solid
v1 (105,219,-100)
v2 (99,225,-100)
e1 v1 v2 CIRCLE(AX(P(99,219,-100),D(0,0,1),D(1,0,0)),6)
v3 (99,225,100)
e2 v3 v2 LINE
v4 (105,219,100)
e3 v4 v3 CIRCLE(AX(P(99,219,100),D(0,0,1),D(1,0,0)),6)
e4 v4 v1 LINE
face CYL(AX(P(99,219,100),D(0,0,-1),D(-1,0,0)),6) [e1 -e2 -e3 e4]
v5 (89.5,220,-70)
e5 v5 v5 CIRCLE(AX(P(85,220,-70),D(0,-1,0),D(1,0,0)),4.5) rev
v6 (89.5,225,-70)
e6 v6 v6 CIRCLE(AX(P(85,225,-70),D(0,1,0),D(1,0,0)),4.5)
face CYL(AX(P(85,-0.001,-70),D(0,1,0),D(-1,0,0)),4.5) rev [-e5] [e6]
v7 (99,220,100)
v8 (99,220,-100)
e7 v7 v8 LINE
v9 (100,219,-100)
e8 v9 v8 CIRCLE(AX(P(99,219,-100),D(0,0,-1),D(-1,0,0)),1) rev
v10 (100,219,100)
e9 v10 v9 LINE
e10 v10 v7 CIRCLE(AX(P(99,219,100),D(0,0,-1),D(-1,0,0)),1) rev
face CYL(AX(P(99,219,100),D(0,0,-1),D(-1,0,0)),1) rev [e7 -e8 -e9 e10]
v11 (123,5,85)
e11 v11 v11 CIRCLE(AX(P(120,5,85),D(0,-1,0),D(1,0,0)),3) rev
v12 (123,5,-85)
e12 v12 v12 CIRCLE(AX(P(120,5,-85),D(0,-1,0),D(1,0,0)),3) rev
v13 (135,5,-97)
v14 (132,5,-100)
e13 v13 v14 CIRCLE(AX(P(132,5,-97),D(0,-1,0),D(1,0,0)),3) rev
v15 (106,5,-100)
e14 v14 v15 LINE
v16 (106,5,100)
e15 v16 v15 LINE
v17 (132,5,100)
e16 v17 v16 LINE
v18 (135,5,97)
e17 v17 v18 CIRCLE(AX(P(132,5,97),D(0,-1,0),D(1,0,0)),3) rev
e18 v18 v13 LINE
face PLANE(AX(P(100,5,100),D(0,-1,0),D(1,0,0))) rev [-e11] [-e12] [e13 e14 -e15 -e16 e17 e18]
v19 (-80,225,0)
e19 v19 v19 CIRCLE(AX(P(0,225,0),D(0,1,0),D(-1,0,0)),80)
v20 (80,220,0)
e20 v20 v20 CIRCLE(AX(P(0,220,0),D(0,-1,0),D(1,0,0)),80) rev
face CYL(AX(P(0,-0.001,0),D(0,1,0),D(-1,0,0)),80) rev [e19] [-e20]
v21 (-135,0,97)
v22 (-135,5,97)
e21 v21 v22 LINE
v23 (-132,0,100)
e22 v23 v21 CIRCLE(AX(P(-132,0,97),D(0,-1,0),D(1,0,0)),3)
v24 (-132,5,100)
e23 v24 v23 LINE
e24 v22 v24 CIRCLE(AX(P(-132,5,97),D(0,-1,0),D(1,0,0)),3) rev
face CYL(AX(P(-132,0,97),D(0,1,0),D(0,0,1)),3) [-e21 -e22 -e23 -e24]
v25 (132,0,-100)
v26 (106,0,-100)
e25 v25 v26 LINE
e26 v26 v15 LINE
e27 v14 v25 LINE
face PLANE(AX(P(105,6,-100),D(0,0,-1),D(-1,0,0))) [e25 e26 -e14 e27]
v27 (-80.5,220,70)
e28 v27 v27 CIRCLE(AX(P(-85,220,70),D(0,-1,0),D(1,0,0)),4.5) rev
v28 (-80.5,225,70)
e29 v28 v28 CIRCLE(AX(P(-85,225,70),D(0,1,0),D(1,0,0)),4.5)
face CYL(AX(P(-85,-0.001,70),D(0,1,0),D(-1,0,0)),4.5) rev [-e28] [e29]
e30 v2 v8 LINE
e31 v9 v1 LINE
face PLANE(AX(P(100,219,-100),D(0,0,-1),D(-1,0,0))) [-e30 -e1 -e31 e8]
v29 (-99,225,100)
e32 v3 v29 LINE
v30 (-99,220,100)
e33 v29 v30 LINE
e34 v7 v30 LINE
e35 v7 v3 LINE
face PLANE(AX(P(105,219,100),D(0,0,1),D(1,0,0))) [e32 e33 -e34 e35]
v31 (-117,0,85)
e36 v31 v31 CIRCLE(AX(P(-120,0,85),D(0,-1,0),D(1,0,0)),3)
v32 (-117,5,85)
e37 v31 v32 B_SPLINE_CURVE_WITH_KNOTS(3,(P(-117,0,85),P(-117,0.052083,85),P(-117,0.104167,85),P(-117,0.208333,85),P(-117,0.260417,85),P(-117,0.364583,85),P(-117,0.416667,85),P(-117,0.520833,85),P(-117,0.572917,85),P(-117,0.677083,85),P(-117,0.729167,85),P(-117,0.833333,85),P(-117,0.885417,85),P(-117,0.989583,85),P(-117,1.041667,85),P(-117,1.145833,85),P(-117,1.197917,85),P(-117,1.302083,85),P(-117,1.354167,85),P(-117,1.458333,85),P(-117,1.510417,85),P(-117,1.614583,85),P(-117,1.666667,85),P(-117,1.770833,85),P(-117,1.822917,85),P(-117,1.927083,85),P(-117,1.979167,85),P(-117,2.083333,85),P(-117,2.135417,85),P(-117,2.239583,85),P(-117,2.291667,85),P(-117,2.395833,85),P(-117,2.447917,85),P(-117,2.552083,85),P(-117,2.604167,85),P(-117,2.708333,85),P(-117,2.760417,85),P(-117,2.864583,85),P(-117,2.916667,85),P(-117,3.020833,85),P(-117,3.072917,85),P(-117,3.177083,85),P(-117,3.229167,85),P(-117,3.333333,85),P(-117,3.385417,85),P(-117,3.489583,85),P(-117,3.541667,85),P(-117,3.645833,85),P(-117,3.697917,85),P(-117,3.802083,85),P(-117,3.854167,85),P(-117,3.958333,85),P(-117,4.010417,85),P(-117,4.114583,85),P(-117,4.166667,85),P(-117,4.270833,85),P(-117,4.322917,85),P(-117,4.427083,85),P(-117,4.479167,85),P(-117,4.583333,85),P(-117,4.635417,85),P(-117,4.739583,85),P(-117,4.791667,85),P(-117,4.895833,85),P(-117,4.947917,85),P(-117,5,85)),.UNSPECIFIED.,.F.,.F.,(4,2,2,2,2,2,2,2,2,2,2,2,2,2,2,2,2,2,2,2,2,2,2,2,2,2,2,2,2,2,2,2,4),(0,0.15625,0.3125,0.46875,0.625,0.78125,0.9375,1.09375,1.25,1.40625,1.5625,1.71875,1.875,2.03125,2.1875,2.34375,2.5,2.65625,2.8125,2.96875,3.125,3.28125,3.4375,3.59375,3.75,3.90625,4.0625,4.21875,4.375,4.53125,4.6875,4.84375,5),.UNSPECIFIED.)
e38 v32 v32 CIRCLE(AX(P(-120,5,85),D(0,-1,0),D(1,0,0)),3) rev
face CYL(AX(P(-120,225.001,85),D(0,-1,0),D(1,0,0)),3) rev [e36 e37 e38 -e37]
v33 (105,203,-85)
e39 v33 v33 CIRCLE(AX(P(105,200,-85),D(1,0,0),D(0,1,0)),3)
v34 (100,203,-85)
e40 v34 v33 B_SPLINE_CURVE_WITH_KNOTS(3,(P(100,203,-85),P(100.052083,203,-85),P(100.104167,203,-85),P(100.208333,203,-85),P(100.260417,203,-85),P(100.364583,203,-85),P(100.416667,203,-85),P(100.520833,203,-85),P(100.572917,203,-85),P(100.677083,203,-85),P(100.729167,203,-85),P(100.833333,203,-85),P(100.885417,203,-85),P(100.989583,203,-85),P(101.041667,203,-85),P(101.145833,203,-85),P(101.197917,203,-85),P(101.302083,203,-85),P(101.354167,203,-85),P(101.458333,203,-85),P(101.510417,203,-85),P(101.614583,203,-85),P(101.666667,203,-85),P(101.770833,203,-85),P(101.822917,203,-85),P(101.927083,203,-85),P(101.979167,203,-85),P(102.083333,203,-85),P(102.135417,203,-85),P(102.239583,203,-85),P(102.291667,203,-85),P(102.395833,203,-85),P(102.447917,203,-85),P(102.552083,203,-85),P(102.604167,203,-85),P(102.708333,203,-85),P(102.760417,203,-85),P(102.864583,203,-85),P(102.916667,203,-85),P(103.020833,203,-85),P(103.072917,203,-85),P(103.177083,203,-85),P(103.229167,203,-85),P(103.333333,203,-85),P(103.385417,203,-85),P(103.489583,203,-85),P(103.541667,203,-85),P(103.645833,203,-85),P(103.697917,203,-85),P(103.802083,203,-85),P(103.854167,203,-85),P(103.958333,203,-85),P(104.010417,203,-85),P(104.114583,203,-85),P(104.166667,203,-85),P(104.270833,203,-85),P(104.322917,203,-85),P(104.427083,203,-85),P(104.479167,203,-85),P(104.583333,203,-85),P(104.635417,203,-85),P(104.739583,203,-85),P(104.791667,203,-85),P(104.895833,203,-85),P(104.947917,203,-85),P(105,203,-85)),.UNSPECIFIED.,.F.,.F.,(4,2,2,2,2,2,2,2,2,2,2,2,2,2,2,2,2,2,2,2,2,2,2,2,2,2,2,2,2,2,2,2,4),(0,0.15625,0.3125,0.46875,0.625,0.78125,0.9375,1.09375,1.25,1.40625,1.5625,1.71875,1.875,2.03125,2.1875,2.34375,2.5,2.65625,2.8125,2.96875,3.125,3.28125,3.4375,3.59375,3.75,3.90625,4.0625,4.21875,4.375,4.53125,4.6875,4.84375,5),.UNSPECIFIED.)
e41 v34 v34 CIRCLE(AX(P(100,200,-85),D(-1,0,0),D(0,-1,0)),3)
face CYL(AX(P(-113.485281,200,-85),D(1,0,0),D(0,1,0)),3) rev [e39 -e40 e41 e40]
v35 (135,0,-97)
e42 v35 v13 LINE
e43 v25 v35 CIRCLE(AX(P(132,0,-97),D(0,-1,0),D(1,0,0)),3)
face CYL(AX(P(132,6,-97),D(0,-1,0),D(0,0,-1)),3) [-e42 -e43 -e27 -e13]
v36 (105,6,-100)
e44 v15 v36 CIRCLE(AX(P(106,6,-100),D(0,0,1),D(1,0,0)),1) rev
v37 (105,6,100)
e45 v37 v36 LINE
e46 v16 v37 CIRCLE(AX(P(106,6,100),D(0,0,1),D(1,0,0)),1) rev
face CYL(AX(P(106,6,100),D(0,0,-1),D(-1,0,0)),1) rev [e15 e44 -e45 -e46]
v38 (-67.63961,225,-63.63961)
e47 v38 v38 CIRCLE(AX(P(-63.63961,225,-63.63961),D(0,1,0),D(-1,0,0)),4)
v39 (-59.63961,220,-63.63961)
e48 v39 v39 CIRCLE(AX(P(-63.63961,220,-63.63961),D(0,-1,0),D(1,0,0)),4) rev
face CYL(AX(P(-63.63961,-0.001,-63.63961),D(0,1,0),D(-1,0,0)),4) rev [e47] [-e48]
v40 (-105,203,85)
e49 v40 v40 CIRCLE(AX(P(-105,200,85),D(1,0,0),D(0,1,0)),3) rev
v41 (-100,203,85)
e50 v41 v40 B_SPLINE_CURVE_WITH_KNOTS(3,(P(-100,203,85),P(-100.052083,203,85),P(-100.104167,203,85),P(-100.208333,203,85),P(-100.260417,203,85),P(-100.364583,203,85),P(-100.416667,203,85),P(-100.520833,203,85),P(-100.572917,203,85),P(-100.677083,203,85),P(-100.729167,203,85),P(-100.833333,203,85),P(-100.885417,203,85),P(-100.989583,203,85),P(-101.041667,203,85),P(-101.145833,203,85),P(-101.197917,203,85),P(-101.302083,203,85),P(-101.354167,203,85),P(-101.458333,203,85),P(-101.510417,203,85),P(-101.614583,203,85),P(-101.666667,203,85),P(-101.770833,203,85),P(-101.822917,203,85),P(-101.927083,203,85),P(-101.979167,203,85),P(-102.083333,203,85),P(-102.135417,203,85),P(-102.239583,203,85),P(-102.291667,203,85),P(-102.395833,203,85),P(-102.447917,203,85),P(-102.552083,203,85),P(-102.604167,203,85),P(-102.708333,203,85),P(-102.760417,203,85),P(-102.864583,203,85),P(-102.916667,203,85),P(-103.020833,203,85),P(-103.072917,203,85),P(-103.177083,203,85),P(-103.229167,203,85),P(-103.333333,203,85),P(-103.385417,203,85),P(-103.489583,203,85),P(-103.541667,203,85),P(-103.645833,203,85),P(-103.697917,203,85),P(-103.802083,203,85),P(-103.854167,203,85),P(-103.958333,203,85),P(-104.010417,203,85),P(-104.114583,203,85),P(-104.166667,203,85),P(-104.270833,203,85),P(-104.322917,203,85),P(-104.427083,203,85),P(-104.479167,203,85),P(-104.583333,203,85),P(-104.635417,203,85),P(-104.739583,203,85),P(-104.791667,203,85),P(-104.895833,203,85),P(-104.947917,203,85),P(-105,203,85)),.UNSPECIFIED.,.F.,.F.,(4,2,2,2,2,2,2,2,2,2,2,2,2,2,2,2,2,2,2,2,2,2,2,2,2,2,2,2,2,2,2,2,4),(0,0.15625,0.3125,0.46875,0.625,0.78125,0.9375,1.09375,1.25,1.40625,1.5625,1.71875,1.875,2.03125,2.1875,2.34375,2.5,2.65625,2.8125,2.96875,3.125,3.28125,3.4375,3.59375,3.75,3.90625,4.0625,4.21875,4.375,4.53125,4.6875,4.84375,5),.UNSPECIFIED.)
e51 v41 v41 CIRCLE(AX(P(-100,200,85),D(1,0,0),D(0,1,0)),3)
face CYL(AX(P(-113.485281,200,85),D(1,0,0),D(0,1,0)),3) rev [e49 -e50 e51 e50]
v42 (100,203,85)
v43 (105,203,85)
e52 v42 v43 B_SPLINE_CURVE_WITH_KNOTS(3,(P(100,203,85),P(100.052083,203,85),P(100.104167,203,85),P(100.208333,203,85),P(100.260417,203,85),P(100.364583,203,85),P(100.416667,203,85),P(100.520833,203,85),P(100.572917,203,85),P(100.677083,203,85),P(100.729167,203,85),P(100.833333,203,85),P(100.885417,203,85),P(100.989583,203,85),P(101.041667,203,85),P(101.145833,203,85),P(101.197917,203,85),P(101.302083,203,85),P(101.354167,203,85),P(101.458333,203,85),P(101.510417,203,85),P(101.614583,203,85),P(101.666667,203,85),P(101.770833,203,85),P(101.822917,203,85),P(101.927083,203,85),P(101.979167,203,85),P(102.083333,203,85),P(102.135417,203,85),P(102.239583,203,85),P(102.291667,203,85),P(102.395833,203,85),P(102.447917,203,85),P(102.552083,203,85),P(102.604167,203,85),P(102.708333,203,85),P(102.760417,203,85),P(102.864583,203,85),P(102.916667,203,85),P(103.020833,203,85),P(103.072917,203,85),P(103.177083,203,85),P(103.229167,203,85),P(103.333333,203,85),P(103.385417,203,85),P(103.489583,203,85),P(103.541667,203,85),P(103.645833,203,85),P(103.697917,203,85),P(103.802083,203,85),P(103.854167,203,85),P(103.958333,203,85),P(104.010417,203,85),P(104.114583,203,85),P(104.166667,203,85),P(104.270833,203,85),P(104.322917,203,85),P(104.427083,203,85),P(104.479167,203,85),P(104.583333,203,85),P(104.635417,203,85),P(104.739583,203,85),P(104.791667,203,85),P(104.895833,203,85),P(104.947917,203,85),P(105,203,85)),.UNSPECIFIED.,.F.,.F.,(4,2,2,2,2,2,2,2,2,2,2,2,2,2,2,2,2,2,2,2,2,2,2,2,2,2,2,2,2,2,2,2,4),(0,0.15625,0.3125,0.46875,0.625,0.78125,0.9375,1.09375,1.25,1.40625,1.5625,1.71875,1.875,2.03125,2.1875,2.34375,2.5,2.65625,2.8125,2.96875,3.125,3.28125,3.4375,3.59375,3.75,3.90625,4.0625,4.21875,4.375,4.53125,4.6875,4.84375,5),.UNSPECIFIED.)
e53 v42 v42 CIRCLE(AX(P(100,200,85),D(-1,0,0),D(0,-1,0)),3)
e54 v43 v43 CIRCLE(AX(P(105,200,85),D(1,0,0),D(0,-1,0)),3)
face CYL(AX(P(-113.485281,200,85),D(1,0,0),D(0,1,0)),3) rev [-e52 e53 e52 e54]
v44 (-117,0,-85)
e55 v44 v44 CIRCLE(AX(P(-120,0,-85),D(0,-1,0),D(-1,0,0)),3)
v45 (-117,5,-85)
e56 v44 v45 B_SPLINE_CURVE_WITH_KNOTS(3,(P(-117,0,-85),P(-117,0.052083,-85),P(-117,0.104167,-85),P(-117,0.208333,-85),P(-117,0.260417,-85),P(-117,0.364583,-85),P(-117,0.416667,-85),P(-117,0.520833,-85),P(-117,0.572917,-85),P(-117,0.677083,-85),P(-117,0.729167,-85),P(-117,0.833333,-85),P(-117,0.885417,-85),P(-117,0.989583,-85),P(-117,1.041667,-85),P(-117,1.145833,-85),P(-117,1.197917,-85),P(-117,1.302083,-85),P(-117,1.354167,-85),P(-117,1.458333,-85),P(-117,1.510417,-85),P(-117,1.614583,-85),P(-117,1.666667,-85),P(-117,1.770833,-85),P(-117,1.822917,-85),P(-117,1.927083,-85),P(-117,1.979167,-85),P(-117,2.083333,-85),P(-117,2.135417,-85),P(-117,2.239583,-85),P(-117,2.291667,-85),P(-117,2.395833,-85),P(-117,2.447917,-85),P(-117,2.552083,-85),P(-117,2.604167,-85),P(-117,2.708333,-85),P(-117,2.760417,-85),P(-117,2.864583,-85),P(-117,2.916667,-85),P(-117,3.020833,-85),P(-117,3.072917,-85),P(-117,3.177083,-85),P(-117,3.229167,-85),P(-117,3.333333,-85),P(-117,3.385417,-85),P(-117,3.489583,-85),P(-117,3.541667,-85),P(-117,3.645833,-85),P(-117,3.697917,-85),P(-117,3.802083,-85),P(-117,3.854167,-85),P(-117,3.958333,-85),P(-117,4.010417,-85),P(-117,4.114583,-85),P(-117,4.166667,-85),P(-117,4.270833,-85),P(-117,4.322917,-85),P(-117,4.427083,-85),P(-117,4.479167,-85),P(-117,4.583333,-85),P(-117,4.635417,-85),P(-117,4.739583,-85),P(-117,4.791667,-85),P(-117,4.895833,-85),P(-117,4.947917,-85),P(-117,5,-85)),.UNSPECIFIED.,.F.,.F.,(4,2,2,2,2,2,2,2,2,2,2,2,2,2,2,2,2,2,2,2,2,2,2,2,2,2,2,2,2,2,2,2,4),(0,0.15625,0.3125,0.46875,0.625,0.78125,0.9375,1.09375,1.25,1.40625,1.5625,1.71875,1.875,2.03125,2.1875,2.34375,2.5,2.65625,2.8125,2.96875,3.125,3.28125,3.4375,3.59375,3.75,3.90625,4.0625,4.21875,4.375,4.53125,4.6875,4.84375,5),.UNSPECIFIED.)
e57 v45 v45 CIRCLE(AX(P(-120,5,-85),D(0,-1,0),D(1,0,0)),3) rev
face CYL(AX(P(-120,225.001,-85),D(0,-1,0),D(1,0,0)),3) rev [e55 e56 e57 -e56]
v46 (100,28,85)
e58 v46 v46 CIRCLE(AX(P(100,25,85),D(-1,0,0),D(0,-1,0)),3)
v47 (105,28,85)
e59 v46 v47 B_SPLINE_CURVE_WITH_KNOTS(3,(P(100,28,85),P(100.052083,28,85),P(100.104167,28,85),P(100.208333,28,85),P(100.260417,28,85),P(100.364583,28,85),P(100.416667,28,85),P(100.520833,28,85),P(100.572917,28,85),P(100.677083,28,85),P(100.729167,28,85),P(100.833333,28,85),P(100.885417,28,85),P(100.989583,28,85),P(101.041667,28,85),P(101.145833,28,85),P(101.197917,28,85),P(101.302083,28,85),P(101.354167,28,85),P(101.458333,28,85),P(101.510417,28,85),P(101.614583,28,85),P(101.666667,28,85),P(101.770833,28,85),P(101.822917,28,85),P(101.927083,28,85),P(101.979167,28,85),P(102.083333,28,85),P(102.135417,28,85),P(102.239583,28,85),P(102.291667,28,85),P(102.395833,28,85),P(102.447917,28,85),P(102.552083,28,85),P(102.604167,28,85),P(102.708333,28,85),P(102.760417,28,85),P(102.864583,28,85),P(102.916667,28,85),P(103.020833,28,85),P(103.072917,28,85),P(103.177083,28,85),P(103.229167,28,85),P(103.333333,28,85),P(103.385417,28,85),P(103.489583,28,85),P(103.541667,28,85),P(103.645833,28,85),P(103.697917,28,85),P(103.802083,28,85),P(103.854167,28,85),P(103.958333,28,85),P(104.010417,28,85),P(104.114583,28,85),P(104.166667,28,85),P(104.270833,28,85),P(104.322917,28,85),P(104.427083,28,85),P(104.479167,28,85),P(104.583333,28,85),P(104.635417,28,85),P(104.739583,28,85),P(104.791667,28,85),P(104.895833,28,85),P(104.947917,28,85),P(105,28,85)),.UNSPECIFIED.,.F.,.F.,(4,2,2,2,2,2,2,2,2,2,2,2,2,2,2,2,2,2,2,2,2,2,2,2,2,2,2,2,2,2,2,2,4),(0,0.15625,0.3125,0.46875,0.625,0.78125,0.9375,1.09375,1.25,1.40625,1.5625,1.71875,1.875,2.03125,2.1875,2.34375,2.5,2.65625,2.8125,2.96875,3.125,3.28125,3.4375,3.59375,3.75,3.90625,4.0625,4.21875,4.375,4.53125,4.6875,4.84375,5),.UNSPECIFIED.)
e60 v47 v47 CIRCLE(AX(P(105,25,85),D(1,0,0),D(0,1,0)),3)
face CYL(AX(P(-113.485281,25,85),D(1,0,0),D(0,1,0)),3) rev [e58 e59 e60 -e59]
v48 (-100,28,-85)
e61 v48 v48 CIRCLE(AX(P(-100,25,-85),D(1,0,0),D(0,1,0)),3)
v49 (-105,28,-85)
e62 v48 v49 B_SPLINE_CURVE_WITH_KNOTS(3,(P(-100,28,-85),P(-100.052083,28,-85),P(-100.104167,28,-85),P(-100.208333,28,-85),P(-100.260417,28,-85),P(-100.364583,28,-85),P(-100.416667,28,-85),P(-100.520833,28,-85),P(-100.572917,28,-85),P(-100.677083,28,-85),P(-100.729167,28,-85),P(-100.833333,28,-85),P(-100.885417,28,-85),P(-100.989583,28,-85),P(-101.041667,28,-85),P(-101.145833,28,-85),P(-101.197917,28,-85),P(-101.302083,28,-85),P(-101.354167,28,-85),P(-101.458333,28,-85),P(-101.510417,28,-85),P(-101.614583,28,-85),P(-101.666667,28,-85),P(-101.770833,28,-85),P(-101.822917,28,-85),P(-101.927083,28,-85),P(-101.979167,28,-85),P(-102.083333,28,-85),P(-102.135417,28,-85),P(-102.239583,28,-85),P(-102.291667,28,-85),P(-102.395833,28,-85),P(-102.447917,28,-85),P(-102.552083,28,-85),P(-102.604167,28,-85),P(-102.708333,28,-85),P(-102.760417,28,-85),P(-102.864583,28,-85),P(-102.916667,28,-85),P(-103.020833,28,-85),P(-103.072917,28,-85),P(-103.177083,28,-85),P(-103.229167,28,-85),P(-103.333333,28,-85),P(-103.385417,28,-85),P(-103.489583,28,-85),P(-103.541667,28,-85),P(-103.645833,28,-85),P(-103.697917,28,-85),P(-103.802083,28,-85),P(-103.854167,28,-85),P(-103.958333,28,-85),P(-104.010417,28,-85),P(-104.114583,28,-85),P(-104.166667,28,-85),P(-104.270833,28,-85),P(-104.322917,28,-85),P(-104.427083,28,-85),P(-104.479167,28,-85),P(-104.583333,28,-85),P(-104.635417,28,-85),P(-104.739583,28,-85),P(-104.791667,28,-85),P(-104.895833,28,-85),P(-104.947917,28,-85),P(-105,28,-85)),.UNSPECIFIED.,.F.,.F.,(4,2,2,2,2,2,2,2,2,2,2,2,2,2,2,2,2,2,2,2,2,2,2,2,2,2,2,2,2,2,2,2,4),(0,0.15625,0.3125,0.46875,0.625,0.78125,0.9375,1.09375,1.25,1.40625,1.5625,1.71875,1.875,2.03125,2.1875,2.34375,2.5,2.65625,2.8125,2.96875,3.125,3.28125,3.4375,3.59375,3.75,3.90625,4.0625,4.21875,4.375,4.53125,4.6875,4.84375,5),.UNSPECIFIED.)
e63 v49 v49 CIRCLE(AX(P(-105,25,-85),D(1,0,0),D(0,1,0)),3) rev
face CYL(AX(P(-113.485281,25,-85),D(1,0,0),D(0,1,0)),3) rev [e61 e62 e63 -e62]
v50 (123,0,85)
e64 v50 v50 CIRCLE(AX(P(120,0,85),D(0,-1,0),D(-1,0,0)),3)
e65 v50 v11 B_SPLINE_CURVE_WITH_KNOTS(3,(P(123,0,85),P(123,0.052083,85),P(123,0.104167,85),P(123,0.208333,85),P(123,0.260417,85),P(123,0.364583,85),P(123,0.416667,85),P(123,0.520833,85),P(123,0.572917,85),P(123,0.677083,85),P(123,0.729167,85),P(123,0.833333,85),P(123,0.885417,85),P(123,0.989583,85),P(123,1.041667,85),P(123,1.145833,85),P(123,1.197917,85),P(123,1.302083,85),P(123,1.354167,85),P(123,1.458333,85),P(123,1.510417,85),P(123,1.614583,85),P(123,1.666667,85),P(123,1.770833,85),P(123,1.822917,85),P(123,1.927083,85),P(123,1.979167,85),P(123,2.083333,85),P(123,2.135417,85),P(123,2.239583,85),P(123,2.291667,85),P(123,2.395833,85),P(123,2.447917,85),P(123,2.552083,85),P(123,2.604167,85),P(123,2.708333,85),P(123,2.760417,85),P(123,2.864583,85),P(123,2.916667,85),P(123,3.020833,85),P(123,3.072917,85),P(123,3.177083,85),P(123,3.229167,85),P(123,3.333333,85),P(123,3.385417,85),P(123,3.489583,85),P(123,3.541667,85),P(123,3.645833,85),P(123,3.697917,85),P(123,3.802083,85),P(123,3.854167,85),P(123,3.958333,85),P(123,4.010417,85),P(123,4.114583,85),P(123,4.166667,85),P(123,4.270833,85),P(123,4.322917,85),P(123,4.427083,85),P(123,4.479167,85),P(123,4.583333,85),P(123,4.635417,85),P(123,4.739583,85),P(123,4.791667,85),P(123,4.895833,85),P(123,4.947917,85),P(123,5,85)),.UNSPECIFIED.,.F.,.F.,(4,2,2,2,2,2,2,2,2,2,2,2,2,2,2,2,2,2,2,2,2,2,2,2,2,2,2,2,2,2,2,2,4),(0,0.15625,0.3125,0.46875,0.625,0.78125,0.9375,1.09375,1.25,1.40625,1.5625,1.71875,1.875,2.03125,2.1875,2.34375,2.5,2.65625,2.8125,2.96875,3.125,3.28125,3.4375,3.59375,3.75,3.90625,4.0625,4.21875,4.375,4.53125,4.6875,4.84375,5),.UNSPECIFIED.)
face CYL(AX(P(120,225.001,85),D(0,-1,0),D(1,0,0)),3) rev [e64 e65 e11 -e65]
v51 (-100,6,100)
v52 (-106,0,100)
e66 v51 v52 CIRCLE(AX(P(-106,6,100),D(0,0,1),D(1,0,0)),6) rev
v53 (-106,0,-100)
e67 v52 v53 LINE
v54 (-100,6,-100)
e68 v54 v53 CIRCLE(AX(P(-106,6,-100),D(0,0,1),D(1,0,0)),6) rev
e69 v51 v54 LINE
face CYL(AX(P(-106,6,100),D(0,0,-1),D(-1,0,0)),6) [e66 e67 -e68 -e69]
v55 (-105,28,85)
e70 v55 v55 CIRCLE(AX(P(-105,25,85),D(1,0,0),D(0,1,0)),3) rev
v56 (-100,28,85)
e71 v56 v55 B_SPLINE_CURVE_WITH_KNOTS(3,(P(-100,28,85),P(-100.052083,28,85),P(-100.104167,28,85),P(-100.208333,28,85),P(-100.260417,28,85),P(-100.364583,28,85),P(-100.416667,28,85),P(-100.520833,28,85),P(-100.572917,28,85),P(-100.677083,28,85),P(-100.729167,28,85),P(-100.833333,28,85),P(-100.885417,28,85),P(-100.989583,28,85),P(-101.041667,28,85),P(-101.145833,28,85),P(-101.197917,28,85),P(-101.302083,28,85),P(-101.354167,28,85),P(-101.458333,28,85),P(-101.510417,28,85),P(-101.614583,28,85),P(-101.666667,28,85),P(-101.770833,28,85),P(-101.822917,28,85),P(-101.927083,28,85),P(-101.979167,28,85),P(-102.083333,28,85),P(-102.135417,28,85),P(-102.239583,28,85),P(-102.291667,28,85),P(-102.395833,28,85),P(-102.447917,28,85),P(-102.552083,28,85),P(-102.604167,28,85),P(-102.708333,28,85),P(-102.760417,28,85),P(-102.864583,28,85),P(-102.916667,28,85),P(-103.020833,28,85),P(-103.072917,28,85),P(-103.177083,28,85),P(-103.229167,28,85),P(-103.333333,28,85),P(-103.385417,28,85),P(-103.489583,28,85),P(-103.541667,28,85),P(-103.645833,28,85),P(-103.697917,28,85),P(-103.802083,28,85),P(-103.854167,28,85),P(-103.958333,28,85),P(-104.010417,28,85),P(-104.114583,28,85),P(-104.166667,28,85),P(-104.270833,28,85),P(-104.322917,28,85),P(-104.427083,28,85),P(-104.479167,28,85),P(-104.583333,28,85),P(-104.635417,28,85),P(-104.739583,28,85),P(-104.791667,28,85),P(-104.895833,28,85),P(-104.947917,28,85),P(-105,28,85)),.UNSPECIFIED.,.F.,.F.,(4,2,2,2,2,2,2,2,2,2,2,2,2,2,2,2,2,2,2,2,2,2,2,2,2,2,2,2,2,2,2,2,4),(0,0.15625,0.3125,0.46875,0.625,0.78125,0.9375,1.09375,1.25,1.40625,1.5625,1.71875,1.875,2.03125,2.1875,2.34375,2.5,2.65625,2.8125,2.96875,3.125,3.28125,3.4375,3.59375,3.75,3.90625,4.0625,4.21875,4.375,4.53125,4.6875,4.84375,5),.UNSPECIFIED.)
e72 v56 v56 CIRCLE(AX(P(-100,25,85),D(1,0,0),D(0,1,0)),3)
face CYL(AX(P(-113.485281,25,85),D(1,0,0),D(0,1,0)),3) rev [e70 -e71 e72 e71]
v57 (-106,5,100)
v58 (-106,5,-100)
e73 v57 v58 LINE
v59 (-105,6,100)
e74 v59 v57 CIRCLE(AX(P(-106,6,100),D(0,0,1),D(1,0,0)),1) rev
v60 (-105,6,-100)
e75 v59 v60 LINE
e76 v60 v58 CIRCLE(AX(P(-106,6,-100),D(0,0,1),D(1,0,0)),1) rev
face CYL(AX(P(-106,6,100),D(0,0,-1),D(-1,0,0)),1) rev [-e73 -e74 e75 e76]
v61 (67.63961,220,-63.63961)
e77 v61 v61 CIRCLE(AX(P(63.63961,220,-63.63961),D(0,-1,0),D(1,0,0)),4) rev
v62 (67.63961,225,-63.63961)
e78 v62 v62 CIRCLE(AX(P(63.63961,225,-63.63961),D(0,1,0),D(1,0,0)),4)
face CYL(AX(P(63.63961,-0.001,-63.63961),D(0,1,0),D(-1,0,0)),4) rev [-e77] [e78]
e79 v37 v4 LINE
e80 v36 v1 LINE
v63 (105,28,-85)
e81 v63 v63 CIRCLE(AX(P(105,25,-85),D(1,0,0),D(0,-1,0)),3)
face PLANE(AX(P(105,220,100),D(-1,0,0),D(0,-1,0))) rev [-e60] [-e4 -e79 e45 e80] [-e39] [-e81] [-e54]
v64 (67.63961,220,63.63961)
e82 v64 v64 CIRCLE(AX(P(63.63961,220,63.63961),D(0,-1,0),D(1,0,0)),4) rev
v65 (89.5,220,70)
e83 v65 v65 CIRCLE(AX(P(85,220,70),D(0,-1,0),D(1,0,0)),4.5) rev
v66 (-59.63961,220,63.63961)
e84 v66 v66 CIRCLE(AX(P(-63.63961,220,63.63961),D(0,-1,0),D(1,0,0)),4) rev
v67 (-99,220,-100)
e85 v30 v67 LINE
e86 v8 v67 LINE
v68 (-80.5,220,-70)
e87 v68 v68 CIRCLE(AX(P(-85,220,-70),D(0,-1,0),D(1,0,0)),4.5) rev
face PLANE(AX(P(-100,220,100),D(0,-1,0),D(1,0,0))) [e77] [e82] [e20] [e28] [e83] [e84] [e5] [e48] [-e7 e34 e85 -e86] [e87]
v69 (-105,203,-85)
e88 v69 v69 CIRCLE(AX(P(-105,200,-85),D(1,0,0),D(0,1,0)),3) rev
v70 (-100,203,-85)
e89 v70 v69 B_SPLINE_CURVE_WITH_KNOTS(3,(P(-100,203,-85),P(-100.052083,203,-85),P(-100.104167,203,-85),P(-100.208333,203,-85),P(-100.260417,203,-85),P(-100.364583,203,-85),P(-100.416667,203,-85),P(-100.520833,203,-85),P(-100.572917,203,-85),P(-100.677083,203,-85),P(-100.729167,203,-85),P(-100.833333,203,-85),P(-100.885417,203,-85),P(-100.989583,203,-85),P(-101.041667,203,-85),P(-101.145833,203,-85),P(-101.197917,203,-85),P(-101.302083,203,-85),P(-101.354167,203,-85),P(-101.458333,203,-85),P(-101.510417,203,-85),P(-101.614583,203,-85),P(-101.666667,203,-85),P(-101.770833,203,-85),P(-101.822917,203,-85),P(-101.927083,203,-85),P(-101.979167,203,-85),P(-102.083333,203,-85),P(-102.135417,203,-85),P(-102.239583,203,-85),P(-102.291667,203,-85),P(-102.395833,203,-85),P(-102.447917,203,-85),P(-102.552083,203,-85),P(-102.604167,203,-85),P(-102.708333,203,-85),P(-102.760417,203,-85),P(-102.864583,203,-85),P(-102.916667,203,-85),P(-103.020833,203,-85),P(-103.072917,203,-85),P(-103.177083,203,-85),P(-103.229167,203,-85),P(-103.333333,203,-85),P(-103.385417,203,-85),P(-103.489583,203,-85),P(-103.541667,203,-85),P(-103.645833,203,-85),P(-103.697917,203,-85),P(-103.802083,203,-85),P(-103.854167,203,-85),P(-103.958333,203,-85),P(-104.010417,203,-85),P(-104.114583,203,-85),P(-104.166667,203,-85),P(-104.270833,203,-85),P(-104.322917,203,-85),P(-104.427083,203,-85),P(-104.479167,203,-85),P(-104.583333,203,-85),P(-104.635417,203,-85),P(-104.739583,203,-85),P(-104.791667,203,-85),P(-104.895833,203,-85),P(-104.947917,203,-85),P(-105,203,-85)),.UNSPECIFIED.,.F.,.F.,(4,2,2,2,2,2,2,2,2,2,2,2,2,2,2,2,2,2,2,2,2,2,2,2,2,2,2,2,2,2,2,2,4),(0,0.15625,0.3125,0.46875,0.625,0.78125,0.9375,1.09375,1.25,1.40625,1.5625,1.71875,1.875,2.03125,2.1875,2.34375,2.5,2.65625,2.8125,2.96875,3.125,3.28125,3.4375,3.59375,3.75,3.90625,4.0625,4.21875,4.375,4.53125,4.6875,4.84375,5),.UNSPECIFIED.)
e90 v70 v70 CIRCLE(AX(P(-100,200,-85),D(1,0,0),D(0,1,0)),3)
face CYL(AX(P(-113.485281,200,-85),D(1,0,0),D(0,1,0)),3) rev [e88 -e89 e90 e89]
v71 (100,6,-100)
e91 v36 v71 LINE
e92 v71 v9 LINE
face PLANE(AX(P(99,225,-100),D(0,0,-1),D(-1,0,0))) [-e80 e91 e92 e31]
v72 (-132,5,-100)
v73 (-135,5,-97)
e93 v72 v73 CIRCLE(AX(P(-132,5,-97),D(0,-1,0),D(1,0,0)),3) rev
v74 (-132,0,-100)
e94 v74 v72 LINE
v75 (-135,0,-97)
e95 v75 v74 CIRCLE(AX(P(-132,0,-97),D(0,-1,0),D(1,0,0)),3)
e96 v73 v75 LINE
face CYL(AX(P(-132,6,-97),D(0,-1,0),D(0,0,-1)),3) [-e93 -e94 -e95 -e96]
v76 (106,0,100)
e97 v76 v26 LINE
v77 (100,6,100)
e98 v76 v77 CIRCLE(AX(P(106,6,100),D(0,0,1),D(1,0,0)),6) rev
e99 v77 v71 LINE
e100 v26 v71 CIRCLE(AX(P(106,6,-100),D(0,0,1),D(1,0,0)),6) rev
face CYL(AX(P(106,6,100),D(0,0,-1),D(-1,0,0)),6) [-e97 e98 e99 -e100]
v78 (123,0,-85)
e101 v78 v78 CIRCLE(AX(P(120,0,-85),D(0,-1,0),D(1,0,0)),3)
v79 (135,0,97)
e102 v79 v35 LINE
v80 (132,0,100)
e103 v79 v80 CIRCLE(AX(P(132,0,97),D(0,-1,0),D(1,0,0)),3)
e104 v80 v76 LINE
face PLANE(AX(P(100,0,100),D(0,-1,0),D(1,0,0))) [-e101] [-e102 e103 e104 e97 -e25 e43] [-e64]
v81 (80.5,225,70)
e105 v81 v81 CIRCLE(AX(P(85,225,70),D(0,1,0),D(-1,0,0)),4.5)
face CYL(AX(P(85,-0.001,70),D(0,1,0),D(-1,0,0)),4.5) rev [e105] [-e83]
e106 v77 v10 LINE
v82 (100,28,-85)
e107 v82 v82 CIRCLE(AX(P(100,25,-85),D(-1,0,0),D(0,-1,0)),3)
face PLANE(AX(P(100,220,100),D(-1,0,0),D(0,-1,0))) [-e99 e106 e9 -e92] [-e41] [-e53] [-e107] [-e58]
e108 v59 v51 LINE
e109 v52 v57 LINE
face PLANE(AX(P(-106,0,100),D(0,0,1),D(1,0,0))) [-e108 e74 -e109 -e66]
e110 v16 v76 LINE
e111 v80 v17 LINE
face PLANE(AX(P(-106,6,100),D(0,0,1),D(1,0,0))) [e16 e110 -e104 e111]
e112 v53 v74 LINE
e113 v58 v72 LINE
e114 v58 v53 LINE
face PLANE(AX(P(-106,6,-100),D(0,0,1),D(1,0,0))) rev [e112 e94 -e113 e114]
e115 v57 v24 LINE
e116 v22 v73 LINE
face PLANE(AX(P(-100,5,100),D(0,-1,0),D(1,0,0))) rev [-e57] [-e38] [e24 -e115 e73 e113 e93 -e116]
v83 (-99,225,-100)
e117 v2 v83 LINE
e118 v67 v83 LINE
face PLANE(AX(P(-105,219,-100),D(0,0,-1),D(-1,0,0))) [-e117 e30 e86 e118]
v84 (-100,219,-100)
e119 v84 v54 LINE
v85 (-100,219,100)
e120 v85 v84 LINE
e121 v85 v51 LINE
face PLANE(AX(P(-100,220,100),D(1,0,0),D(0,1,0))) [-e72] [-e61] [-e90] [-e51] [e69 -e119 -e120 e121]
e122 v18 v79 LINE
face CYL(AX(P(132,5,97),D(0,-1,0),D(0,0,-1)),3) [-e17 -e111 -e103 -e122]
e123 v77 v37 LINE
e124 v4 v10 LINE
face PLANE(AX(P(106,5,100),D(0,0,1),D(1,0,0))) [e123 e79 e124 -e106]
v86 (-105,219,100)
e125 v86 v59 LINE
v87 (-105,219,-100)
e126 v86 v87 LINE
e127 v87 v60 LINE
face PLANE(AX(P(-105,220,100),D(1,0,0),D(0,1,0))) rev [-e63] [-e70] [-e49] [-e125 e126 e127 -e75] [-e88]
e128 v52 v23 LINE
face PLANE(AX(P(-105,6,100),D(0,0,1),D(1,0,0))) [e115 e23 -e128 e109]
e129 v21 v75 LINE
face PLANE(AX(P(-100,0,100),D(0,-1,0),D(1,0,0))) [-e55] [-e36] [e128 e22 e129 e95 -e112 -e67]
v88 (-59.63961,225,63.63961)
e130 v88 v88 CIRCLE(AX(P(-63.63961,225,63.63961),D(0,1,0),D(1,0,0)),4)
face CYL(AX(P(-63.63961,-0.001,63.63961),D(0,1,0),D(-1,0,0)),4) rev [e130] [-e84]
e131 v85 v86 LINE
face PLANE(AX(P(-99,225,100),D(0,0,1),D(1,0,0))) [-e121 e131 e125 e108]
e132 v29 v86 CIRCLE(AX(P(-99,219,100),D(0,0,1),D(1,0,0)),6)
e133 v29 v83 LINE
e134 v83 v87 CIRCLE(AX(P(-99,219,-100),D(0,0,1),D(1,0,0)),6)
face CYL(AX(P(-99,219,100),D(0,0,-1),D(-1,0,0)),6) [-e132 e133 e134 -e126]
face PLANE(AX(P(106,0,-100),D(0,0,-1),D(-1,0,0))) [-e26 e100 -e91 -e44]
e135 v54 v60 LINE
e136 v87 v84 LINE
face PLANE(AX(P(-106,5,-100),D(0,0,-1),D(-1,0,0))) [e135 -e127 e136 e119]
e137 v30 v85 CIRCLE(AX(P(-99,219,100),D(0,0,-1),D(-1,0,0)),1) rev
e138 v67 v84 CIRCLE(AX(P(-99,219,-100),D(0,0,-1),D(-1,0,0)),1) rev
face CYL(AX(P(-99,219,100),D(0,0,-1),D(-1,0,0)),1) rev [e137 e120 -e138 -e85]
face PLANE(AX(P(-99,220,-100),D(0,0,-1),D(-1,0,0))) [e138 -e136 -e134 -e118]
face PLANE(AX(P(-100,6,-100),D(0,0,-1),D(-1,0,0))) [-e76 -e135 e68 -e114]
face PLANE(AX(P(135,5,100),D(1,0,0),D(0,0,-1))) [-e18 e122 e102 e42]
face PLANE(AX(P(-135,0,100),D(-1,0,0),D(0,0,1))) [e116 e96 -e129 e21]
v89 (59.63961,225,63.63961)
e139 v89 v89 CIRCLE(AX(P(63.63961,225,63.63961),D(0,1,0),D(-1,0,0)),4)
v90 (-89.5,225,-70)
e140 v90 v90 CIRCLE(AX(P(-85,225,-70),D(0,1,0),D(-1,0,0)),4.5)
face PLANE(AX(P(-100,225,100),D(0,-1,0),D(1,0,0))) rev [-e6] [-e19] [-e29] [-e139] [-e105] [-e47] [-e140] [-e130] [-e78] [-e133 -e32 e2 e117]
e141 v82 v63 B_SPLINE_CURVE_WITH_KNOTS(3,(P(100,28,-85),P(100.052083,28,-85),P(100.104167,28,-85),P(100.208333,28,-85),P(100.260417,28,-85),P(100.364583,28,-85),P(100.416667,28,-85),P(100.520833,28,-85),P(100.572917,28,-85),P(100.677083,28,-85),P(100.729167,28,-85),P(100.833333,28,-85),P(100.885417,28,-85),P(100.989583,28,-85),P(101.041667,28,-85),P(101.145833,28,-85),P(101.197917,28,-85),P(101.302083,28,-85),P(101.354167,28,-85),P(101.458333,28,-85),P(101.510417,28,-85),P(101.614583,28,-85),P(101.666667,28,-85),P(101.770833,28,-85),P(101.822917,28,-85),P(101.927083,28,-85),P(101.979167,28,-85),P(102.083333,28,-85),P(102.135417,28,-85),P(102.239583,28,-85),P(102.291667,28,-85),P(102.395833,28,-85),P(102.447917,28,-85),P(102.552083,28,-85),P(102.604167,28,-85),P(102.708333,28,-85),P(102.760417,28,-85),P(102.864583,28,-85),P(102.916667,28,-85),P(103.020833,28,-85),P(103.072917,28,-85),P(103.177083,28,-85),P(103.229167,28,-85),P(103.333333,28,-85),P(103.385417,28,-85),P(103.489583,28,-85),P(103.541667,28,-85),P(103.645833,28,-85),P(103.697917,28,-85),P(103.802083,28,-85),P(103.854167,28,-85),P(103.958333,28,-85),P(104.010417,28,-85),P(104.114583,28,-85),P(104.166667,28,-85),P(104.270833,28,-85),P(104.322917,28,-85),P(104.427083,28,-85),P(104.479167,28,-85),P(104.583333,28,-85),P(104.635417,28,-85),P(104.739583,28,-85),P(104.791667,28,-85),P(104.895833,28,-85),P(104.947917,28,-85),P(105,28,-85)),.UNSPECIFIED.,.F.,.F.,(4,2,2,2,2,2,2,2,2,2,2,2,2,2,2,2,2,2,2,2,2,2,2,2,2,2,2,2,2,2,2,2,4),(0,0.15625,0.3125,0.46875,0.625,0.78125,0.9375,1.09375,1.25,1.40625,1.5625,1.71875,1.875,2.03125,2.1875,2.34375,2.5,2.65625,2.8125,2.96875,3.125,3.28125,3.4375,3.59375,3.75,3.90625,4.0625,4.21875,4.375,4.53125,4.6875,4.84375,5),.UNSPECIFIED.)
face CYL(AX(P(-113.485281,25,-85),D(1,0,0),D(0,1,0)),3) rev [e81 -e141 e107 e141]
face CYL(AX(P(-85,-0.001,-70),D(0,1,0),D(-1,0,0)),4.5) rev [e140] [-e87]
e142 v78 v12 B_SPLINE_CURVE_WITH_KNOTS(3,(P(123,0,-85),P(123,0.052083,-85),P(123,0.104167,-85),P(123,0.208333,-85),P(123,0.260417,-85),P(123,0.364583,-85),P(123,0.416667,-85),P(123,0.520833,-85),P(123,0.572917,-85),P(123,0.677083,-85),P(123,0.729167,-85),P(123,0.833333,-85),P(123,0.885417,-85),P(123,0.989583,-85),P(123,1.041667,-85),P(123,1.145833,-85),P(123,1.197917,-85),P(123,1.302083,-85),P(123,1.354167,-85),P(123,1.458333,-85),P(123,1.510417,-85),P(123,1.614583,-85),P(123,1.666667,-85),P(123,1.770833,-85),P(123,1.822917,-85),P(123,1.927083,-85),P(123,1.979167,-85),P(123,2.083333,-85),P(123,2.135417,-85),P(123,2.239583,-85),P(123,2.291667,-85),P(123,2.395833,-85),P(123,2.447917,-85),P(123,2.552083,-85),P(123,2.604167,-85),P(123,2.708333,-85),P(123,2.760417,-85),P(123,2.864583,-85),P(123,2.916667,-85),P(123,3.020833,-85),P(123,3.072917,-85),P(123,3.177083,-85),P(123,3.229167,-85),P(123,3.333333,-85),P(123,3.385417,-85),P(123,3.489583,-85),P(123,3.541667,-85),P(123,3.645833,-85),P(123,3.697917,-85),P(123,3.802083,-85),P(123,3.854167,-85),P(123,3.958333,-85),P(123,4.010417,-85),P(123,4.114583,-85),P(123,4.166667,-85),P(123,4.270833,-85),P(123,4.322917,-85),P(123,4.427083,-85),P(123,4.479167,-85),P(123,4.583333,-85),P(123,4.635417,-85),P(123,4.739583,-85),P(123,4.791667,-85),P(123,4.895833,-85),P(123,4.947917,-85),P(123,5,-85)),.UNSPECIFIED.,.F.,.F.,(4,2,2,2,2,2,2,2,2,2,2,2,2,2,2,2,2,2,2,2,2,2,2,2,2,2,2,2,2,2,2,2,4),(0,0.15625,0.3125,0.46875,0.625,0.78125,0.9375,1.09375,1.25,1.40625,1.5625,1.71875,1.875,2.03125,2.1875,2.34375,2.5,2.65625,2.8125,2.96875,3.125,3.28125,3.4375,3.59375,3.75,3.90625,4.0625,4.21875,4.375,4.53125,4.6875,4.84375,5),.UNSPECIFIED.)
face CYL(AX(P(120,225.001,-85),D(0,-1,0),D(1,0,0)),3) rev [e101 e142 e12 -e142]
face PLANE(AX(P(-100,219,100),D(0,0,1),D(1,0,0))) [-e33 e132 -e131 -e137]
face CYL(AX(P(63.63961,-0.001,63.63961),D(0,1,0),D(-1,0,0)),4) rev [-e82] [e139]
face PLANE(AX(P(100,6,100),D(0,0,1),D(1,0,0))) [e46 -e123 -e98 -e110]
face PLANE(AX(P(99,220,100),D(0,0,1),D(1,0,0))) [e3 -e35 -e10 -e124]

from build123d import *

# Parameters (mm, degrees)
BASE_FLANGE1_START = -100
BASE_FLANGE1_DEPTH = 200
CUT_EXTRUDE1_REACH = 282.802
SKETCH6_R          = 3
CUT_EXTRUDE2_REACH = 282.802
SKETCH7_R          = 80
SKETCH7_R_2        = 4
CUT_EXTRUDE3_REACH = 345.839
SKETCH8_R          = 3
FILLET1_R          = 3
CUT_EXTRUDE4_REACH = 282.802
SKETCH9_R          = 4.5


# Read off the part's stored shape, not the designer's step: Base-Flange1
with BuildPart() as part:
    # Base-Flange1 outline → Base-Flange1 (new body)
    with BuildSketch(Plane.XY.offset(BASE_FLANGE1_START)):
        with BuildLine():
            Line((-106, 5), (-135, 5))
            Line((-135, 5), (-135, 0))
            Line((-135, 0), (-106, 0))
            ThreePointArc((-106, 0), (-101.757359313, 1.757359313), (-100, 6))
            Line((-100, 6), (-100, 219))
            ThreePointArc((-100, 219), (-99.707106781, 219.707106781), (-99, 220))
            Line((-99, 220), (99, 220))
            ThreePointArc((99, 220), (99.707106781, 219.707106781), (100, 219))
            Line((100, 219), (100, 6))
            ThreePointArc((100, 6), (101.757359313, 1.757359313), (106, 0))
            Line((106, 0), (135, 0))
            Line((135, 0), (135, 5))
            Line((135, 5), (106, 5))
            ThreePointArc((106, 5), (105.292893219, 5.292893219), (105, 6))
            Line((105, 6), (105, 219))
            ThreePointArc((105, 219), (103.242640687, 223.242640687), (99, 225))
            Line((99, 225), (-99, 225))
            ThreePointArc((-99, 225), (-103.242640687, 223.242640687), (-105, 219))
            Line((-105, 219), (-105, 6))
            ThreePointArc((-105, 6), (-105.292893219, 5.292893219), (-106, 5))
        make_face()
    extrude(amount=BASE_FLANGE1_DEPTH)

    # Sketch6 → Cut-Extrude1 (cut, up to next)
    with BuildSketch(Plane.XZ, mode=Mode.PRIVATE) as cut_extrude1_sk1:
        with Locations((-120, 85)):
            Circle(SKETCH6_R)
    cut_extrude1_tool1 = extrude(cut_extrude1_sk1.sketch, amount=-CUT_EXTRUDE1_REACH, mode=Mode.PRIVATE) & part.part
    # Sketch6 → Cut-Extrude1 (cut, up to next)
    with BuildSketch(Plane.XZ, mode=Mode.PRIVATE) as cut_extrude1_sk2:
        with Locations((120, 85)):
            Circle(SKETCH6_R)
    cut_extrude1_tool2 = extrude(cut_extrude1_sk2.sketch, amount=-CUT_EXTRUDE1_REACH, mode=Mode.PRIVATE) & part.part
    # Sketch6 → Cut-Extrude1 (cut, up to next)
    with BuildSketch(Plane.XZ, mode=Mode.PRIVATE) as cut_extrude1_sk3:
        with Locations((120, -85)):
            Circle(SKETCH6_R)
    cut_extrude1_tool3 = extrude(cut_extrude1_sk3.sketch, amount=-CUT_EXTRUDE1_REACH, mode=Mode.PRIVATE) & part.part
    # Sketch6 → Cut-Extrude1 (cut, up to next)
    with BuildSketch(Plane.XZ, mode=Mode.PRIVATE) as cut_extrude1_sk4:
        with Locations((-120, -85)):
            Circle(SKETCH6_R)
    cut_extrude1_tool4 = extrude(cut_extrude1_sk4.sketch, amount=-CUT_EXTRUDE1_REACH, mode=Mode.PRIVATE) & part.part
    add(cut_extrude1_tool1.solids().sort_by_distance((-120, 0, 85))[0], mode=Mode.SUBTRACT)
    add(cut_extrude1_tool2.solids().sort_by_distance((120, 0, 85))[0], mode=Mode.SUBTRACT)
    add(cut_extrude1_tool3.solids().sort_by_distance((120, 0, -85))[0], mode=Mode.SUBTRACT)
    add(cut_extrude1_tool4.solids().sort_by_distance((-120, 0, -85))[0], mode=Mode.SUBTRACT)

    # Sketch7 → Cut-Extrude2 (cut, up to next)
    with BuildSketch(Plane(origin=(0, 225, 0), x_dir=(1, 0, 0), z_dir=(0, 1, 0)), mode=Mode.PRIVATE) as cut_extrude2_sk1:
        with Locations(Location((0, 0, 0), (0, 0, 180))):
            Circle(SKETCH7_R)
    cut_extrude2_tool1 = extrude(cut_extrude2_sk1.sketch, amount=-CUT_EXTRUDE2_REACH, mode=Mode.PRIVATE) & part.part
    # Sketch7 → Cut-Extrude2 (cut, up to next)
    with BuildSketch(Plane(origin=(0, 225, 0), x_dir=(1, 0, 0), z_dir=(0, 1, 0)), mode=Mode.PRIVATE) as cut_extrude2_sk2:
        with Locations(Location((-63.639610307, 63.639610307, 0), (0, 0, 180))):
            Circle(SKETCH7_R_2)
    cut_extrude2_tool2 = extrude(cut_extrude2_sk2.sketch, amount=-CUT_EXTRUDE2_REACH, mode=Mode.PRIVATE) & part.part
    # Sketch7 → Cut-Extrude2 (cut, up to next)
    with BuildSketch(Plane(origin=(0, 225, 0), x_dir=(1, 0, 0), z_dir=(0, 1, 0)), mode=Mode.PRIVATE) as cut_extrude2_sk3:
        with Locations((63.639610307, 63.639610307)):
            Circle(SKETCH7_R_2)
    cut_extrude2_tool3 = extrude(cut_extrude2_sk3.sketch, amount=-CUT_EXTRUDE2_REACH, mode=Mode.PRIVATE) & part.part
    # Sketch7 → Cut-Extrude2 (cut, up to next)
    with BuildSketch(Plane(origin=(0, 225, 0), x_dir=(1, 0, 0), z_dir=(0, 1, 0)), mode=Mode.PRIVATE) as cut_extrude2_sk4:
        with Locations(Location((63.639610307, -63.639610307, 0), (0, 0, 180))):
            Circle(SKETCH7_R_2)
    cut_extrude2_tool4 = extrude(cut_extrude2_sk4.sketch, amount=-CUT_EXTRUDE2_REACH, mode=Mode.PRIVATE) & part.part
    # Sketch7 → Cut-Extrude2 (cut, up to next)
    with BuildSketch(Plane(origin=(0, 225, 0), x_dir=(1, 0, 0), z_dir=(0, 1, 0)), mode=Mode.PRIVATE) as cut_extrude2_sk5:
        with Locations((-63.639610307, -63.639610307)):
            Circle(SKETCH7_R_2)
    cut_extrude2_tool5 = extrude(cut_extrude2_sk5.sketch, amount=-CUT_EXTRUDE2_REACH, mode=Mode.PRIVATE) & part.part
    add(cut_extrude2_tool1.solids().sort_by_distance((0, 225, 0))[0], mode=Mode.SUBTRACT)
    add(cut_extrude2_tool2.solids().sort_by_distance((-63.63961, 225, -63.63961))[0], mode=Mode.SUBTRACT)
    add(cut_extrude2_tool3.solids().sort_by_distance((63.63961, 225, -63.63961))[0], mode=Mode.SUBTRACT)
    add(cut_extrude2_tool4.solids().sort_by_distance((63.63961, 225, 63.63961))[0], mode=Mode.SUBTRACT)
    add(cut_extrude2_tool5.solids().sort_by_distance((-63.63961, 225, 63.63961))[0], mode=Mode.SUBTRACT)

    # Cut-Extrude3: up to this face of the body (flat: up to its plane)
    cut_extrude3_end = Plane(part.part.faces().sort_by_distance((-105, 112.5, 0))[0])
    # Sketch8 → Cut-Extrude3 (cut, up to the picked face)
    with BuildSketch(Plane(origin=(105, 0, 0), x_dir=(0, 0, -1), z_dir=(1, 0, 0)), mode=Mode.PRIVATE) as cut_extrude3_sk1:
        with Locations(Location((85, 200, 0), (0, 0, 90))):
            Circle(SKETCH8_R)
    cut_extrude3_tool1 = split(extrude(cut_extrude3_sk1.sketch, amount=-CUT_EXTRUDE3_REACH, mode=Mode.PRIVATE), bisect_by=cut_extrude3_end, keep=Keep.BOTH, mode=Mode.PRIVATE)
    # Sketch8 → Cut-Extrude3 (cut, up to the picked face)
    with BuildSketch(Plane(origin=(105, 0, 0), x_dir=(0, 0, -1), z_dir=(1, 0, 0)), mode=Mode.PRIVATE) as cut_extrude3_sk2:
        with Locations(Location((85, 25, 0), (0, 0, 90))):
            Circle(SKETCH8_R)
    cut_extrude3_tool2 = split(extrude(cut_extrude3_sk2.sketch, amount=-CUT_EXTRUDE3_REACH, mode=Mode.PRIVATE), bisect_by=cut_extrude3_end, keep=Keep.BOTH, mode=Mode.PRIVATE)
    # Sketch8 → Cut-Extrude3 (cut, up to the picked face)
    with BuildSketch(Plane(origin=(105, 0, 0), x_dir=(0, 0, -1), z_dir=(1, 0, 0)), mode=Mode.PRIVATE) as cut_extrude3_sk3:
        with Locations(Location((-85, 25, 0), (0, 0, 90))):
            Circle(SKETCH8_R)
    cut_extrude3_tool3 = split(extrude(cut_extrude3_sk3.sketch, amount=-CUT_EXTRUDE3_REACH, mode=Mode.PRIVATE), bisect_by=cut_extrude3_end, keep=Keep.BOTH, mode=Mode.PRIVATE)
    # Sketch8 → Cut-Extrude3 (cut, up to the picked face)
    with BuildSketch(Plane(origin=(105, 0, 0), x_dir=(0, 0, -1), z_dir=(1, 0, 0)), mode=Mode.PRIVATE) as cut_extrude3_sk4:
        with Locations(Location((-85, 200, 0), (0, 0, 90))):
            Circle(SKETCH8_R)
    cut_extrude3_tool4 = split(extrude(cut_extrude3_sk4.sketch, amount=-CUT_EXTRUDE3_REACH, mode=Mode.PRIVATE), bisect_by=cut_extrude3_end, keep=Keep.BOTH, mode=Mode.PRIVATE)
    add(cut_extrude3_tool1.solids().sort_by(Axis((105, 200, -85), (-1, 0, 0)))[0], mode=Mode.SUBTRACT)
    add(cut_extrude3_tool2.solids().sort_by(Axis((105, 25, -85), (-1, 0, 0)))[0], mode=Mode.SUBTRACT)
    add(cut_extrude3_tool3.solids().sort_by(Axis((105, 25, 85), (-1, 0, 0)))[0], mode=Mode.SUBTRACT)
    add(cut_extrude3_tool4.solids().sort_by(Axis((105, 200, 85), (-1, 0, 0)))[0], mode=Mode.SUBTRACT)

    # Fillet1
    fillet1_edges = [part.edges().sort_by_distance(p)[0] for p in [
        (135, 2.5, -100),
        (-135, 2.5, -100),
        (135, 2.5, 100),
        (-135, 2.5, 100),
    ]]
    fillet(fillet1_edges, radius=FILLET1_R)

    # Sketch9 → Cut-Extrude4 (cut, up to next)
    with BuildSketch(Plane(origin=(0, 225, 0), x_dir=(1, 0, 0), z_dir=(0, 1, 0)), mode=Mode.PRIVATE) as cut_extrude4_sk1:
        with Locations(Location((-85, 70, 0), (0, 0, 180))):
            Circle(SKETCH9_R)
    cut_extrude4_tool1 = extrude(cut_extrude4_sk1.sketch, amount=-CUT_EXTRUDE4_REACH, mode=Mode.PRIVATE) & part.part
    # Sketch9 → Cut-Extrude4 (cut, up to next)
    with BuildSketch(Plane(origin=(0, 225, 0), x_dir=(1, 0, 0), z_dir=(0, 1, 0)), mode=Mode.PRIVATE) as cut_extrude4_sk2:
        with Locations((85, 70)):
            Circle(SKETCH9_R)
    cut_extrude4_tool2 = extrude(cut_extrude4_sk2.sketch, amount=-CUT_EXTRUDE4_REACH, mode=Mode.PRIVATE) & part.part
    # Sketch9 → Cut-Extrude4 (cut, up to next)
    with BuildSketch(Plane(origin=(0, 225, 0), x_dir=(1, 0, 0), z_dir=(0, 1, 0)), mode=Mode.PRIVATE) as cut_extrude4_sk3:
        with Locations(Location((85, -70, 0), (0, 0, 180))):
            Circle(SKETCH9_R)
    cut_extrude4_tool3 = extrude(cut_extrude4_sk3.sketch, amount=-CUT_EXTRUDE4_REACH, mode=Mode.PRIVATE) & part.part
    # Sketch9 → Cut-Extrude4 (cut, up to next)
    with BuildSketch(Plane(origin=(0, 225, 0), x_dir=(1, 0, 0), z_dir=(0, 1, 0)), mode=Mode.PRIVATE) as cut_extrude4_sk4:
        with Locations((-85, -70)):
            Circle(SKETCH9_R)
    cut_extrude4_tool4 = extrude(cut_extrude4_sk4.sketch, amount=-CUT_EXTRUDE4_REACH, mode=Mode.PRIVATE) & part.part
    add(cut_extrude4_tool1.solids().sort_by_distance((-85, 225, -70))[0], mode=Mode.SUBTRACT)
    add(cut_extrude4_tool2.solids().sort_by_distance((85, 225, -70))[0], mode=Mode.SUBTRACT)
    add(cut_extrude4_tool3.solids().sort_by_distance((85, 225, 70))[0], mode=Mode.SUBTRACT)
    add(cut_extrude4_tool4.solids().sort_by_distance((-85, 225, 70))[0], mode=Mode.SUBTRACT)


solid = part.part
